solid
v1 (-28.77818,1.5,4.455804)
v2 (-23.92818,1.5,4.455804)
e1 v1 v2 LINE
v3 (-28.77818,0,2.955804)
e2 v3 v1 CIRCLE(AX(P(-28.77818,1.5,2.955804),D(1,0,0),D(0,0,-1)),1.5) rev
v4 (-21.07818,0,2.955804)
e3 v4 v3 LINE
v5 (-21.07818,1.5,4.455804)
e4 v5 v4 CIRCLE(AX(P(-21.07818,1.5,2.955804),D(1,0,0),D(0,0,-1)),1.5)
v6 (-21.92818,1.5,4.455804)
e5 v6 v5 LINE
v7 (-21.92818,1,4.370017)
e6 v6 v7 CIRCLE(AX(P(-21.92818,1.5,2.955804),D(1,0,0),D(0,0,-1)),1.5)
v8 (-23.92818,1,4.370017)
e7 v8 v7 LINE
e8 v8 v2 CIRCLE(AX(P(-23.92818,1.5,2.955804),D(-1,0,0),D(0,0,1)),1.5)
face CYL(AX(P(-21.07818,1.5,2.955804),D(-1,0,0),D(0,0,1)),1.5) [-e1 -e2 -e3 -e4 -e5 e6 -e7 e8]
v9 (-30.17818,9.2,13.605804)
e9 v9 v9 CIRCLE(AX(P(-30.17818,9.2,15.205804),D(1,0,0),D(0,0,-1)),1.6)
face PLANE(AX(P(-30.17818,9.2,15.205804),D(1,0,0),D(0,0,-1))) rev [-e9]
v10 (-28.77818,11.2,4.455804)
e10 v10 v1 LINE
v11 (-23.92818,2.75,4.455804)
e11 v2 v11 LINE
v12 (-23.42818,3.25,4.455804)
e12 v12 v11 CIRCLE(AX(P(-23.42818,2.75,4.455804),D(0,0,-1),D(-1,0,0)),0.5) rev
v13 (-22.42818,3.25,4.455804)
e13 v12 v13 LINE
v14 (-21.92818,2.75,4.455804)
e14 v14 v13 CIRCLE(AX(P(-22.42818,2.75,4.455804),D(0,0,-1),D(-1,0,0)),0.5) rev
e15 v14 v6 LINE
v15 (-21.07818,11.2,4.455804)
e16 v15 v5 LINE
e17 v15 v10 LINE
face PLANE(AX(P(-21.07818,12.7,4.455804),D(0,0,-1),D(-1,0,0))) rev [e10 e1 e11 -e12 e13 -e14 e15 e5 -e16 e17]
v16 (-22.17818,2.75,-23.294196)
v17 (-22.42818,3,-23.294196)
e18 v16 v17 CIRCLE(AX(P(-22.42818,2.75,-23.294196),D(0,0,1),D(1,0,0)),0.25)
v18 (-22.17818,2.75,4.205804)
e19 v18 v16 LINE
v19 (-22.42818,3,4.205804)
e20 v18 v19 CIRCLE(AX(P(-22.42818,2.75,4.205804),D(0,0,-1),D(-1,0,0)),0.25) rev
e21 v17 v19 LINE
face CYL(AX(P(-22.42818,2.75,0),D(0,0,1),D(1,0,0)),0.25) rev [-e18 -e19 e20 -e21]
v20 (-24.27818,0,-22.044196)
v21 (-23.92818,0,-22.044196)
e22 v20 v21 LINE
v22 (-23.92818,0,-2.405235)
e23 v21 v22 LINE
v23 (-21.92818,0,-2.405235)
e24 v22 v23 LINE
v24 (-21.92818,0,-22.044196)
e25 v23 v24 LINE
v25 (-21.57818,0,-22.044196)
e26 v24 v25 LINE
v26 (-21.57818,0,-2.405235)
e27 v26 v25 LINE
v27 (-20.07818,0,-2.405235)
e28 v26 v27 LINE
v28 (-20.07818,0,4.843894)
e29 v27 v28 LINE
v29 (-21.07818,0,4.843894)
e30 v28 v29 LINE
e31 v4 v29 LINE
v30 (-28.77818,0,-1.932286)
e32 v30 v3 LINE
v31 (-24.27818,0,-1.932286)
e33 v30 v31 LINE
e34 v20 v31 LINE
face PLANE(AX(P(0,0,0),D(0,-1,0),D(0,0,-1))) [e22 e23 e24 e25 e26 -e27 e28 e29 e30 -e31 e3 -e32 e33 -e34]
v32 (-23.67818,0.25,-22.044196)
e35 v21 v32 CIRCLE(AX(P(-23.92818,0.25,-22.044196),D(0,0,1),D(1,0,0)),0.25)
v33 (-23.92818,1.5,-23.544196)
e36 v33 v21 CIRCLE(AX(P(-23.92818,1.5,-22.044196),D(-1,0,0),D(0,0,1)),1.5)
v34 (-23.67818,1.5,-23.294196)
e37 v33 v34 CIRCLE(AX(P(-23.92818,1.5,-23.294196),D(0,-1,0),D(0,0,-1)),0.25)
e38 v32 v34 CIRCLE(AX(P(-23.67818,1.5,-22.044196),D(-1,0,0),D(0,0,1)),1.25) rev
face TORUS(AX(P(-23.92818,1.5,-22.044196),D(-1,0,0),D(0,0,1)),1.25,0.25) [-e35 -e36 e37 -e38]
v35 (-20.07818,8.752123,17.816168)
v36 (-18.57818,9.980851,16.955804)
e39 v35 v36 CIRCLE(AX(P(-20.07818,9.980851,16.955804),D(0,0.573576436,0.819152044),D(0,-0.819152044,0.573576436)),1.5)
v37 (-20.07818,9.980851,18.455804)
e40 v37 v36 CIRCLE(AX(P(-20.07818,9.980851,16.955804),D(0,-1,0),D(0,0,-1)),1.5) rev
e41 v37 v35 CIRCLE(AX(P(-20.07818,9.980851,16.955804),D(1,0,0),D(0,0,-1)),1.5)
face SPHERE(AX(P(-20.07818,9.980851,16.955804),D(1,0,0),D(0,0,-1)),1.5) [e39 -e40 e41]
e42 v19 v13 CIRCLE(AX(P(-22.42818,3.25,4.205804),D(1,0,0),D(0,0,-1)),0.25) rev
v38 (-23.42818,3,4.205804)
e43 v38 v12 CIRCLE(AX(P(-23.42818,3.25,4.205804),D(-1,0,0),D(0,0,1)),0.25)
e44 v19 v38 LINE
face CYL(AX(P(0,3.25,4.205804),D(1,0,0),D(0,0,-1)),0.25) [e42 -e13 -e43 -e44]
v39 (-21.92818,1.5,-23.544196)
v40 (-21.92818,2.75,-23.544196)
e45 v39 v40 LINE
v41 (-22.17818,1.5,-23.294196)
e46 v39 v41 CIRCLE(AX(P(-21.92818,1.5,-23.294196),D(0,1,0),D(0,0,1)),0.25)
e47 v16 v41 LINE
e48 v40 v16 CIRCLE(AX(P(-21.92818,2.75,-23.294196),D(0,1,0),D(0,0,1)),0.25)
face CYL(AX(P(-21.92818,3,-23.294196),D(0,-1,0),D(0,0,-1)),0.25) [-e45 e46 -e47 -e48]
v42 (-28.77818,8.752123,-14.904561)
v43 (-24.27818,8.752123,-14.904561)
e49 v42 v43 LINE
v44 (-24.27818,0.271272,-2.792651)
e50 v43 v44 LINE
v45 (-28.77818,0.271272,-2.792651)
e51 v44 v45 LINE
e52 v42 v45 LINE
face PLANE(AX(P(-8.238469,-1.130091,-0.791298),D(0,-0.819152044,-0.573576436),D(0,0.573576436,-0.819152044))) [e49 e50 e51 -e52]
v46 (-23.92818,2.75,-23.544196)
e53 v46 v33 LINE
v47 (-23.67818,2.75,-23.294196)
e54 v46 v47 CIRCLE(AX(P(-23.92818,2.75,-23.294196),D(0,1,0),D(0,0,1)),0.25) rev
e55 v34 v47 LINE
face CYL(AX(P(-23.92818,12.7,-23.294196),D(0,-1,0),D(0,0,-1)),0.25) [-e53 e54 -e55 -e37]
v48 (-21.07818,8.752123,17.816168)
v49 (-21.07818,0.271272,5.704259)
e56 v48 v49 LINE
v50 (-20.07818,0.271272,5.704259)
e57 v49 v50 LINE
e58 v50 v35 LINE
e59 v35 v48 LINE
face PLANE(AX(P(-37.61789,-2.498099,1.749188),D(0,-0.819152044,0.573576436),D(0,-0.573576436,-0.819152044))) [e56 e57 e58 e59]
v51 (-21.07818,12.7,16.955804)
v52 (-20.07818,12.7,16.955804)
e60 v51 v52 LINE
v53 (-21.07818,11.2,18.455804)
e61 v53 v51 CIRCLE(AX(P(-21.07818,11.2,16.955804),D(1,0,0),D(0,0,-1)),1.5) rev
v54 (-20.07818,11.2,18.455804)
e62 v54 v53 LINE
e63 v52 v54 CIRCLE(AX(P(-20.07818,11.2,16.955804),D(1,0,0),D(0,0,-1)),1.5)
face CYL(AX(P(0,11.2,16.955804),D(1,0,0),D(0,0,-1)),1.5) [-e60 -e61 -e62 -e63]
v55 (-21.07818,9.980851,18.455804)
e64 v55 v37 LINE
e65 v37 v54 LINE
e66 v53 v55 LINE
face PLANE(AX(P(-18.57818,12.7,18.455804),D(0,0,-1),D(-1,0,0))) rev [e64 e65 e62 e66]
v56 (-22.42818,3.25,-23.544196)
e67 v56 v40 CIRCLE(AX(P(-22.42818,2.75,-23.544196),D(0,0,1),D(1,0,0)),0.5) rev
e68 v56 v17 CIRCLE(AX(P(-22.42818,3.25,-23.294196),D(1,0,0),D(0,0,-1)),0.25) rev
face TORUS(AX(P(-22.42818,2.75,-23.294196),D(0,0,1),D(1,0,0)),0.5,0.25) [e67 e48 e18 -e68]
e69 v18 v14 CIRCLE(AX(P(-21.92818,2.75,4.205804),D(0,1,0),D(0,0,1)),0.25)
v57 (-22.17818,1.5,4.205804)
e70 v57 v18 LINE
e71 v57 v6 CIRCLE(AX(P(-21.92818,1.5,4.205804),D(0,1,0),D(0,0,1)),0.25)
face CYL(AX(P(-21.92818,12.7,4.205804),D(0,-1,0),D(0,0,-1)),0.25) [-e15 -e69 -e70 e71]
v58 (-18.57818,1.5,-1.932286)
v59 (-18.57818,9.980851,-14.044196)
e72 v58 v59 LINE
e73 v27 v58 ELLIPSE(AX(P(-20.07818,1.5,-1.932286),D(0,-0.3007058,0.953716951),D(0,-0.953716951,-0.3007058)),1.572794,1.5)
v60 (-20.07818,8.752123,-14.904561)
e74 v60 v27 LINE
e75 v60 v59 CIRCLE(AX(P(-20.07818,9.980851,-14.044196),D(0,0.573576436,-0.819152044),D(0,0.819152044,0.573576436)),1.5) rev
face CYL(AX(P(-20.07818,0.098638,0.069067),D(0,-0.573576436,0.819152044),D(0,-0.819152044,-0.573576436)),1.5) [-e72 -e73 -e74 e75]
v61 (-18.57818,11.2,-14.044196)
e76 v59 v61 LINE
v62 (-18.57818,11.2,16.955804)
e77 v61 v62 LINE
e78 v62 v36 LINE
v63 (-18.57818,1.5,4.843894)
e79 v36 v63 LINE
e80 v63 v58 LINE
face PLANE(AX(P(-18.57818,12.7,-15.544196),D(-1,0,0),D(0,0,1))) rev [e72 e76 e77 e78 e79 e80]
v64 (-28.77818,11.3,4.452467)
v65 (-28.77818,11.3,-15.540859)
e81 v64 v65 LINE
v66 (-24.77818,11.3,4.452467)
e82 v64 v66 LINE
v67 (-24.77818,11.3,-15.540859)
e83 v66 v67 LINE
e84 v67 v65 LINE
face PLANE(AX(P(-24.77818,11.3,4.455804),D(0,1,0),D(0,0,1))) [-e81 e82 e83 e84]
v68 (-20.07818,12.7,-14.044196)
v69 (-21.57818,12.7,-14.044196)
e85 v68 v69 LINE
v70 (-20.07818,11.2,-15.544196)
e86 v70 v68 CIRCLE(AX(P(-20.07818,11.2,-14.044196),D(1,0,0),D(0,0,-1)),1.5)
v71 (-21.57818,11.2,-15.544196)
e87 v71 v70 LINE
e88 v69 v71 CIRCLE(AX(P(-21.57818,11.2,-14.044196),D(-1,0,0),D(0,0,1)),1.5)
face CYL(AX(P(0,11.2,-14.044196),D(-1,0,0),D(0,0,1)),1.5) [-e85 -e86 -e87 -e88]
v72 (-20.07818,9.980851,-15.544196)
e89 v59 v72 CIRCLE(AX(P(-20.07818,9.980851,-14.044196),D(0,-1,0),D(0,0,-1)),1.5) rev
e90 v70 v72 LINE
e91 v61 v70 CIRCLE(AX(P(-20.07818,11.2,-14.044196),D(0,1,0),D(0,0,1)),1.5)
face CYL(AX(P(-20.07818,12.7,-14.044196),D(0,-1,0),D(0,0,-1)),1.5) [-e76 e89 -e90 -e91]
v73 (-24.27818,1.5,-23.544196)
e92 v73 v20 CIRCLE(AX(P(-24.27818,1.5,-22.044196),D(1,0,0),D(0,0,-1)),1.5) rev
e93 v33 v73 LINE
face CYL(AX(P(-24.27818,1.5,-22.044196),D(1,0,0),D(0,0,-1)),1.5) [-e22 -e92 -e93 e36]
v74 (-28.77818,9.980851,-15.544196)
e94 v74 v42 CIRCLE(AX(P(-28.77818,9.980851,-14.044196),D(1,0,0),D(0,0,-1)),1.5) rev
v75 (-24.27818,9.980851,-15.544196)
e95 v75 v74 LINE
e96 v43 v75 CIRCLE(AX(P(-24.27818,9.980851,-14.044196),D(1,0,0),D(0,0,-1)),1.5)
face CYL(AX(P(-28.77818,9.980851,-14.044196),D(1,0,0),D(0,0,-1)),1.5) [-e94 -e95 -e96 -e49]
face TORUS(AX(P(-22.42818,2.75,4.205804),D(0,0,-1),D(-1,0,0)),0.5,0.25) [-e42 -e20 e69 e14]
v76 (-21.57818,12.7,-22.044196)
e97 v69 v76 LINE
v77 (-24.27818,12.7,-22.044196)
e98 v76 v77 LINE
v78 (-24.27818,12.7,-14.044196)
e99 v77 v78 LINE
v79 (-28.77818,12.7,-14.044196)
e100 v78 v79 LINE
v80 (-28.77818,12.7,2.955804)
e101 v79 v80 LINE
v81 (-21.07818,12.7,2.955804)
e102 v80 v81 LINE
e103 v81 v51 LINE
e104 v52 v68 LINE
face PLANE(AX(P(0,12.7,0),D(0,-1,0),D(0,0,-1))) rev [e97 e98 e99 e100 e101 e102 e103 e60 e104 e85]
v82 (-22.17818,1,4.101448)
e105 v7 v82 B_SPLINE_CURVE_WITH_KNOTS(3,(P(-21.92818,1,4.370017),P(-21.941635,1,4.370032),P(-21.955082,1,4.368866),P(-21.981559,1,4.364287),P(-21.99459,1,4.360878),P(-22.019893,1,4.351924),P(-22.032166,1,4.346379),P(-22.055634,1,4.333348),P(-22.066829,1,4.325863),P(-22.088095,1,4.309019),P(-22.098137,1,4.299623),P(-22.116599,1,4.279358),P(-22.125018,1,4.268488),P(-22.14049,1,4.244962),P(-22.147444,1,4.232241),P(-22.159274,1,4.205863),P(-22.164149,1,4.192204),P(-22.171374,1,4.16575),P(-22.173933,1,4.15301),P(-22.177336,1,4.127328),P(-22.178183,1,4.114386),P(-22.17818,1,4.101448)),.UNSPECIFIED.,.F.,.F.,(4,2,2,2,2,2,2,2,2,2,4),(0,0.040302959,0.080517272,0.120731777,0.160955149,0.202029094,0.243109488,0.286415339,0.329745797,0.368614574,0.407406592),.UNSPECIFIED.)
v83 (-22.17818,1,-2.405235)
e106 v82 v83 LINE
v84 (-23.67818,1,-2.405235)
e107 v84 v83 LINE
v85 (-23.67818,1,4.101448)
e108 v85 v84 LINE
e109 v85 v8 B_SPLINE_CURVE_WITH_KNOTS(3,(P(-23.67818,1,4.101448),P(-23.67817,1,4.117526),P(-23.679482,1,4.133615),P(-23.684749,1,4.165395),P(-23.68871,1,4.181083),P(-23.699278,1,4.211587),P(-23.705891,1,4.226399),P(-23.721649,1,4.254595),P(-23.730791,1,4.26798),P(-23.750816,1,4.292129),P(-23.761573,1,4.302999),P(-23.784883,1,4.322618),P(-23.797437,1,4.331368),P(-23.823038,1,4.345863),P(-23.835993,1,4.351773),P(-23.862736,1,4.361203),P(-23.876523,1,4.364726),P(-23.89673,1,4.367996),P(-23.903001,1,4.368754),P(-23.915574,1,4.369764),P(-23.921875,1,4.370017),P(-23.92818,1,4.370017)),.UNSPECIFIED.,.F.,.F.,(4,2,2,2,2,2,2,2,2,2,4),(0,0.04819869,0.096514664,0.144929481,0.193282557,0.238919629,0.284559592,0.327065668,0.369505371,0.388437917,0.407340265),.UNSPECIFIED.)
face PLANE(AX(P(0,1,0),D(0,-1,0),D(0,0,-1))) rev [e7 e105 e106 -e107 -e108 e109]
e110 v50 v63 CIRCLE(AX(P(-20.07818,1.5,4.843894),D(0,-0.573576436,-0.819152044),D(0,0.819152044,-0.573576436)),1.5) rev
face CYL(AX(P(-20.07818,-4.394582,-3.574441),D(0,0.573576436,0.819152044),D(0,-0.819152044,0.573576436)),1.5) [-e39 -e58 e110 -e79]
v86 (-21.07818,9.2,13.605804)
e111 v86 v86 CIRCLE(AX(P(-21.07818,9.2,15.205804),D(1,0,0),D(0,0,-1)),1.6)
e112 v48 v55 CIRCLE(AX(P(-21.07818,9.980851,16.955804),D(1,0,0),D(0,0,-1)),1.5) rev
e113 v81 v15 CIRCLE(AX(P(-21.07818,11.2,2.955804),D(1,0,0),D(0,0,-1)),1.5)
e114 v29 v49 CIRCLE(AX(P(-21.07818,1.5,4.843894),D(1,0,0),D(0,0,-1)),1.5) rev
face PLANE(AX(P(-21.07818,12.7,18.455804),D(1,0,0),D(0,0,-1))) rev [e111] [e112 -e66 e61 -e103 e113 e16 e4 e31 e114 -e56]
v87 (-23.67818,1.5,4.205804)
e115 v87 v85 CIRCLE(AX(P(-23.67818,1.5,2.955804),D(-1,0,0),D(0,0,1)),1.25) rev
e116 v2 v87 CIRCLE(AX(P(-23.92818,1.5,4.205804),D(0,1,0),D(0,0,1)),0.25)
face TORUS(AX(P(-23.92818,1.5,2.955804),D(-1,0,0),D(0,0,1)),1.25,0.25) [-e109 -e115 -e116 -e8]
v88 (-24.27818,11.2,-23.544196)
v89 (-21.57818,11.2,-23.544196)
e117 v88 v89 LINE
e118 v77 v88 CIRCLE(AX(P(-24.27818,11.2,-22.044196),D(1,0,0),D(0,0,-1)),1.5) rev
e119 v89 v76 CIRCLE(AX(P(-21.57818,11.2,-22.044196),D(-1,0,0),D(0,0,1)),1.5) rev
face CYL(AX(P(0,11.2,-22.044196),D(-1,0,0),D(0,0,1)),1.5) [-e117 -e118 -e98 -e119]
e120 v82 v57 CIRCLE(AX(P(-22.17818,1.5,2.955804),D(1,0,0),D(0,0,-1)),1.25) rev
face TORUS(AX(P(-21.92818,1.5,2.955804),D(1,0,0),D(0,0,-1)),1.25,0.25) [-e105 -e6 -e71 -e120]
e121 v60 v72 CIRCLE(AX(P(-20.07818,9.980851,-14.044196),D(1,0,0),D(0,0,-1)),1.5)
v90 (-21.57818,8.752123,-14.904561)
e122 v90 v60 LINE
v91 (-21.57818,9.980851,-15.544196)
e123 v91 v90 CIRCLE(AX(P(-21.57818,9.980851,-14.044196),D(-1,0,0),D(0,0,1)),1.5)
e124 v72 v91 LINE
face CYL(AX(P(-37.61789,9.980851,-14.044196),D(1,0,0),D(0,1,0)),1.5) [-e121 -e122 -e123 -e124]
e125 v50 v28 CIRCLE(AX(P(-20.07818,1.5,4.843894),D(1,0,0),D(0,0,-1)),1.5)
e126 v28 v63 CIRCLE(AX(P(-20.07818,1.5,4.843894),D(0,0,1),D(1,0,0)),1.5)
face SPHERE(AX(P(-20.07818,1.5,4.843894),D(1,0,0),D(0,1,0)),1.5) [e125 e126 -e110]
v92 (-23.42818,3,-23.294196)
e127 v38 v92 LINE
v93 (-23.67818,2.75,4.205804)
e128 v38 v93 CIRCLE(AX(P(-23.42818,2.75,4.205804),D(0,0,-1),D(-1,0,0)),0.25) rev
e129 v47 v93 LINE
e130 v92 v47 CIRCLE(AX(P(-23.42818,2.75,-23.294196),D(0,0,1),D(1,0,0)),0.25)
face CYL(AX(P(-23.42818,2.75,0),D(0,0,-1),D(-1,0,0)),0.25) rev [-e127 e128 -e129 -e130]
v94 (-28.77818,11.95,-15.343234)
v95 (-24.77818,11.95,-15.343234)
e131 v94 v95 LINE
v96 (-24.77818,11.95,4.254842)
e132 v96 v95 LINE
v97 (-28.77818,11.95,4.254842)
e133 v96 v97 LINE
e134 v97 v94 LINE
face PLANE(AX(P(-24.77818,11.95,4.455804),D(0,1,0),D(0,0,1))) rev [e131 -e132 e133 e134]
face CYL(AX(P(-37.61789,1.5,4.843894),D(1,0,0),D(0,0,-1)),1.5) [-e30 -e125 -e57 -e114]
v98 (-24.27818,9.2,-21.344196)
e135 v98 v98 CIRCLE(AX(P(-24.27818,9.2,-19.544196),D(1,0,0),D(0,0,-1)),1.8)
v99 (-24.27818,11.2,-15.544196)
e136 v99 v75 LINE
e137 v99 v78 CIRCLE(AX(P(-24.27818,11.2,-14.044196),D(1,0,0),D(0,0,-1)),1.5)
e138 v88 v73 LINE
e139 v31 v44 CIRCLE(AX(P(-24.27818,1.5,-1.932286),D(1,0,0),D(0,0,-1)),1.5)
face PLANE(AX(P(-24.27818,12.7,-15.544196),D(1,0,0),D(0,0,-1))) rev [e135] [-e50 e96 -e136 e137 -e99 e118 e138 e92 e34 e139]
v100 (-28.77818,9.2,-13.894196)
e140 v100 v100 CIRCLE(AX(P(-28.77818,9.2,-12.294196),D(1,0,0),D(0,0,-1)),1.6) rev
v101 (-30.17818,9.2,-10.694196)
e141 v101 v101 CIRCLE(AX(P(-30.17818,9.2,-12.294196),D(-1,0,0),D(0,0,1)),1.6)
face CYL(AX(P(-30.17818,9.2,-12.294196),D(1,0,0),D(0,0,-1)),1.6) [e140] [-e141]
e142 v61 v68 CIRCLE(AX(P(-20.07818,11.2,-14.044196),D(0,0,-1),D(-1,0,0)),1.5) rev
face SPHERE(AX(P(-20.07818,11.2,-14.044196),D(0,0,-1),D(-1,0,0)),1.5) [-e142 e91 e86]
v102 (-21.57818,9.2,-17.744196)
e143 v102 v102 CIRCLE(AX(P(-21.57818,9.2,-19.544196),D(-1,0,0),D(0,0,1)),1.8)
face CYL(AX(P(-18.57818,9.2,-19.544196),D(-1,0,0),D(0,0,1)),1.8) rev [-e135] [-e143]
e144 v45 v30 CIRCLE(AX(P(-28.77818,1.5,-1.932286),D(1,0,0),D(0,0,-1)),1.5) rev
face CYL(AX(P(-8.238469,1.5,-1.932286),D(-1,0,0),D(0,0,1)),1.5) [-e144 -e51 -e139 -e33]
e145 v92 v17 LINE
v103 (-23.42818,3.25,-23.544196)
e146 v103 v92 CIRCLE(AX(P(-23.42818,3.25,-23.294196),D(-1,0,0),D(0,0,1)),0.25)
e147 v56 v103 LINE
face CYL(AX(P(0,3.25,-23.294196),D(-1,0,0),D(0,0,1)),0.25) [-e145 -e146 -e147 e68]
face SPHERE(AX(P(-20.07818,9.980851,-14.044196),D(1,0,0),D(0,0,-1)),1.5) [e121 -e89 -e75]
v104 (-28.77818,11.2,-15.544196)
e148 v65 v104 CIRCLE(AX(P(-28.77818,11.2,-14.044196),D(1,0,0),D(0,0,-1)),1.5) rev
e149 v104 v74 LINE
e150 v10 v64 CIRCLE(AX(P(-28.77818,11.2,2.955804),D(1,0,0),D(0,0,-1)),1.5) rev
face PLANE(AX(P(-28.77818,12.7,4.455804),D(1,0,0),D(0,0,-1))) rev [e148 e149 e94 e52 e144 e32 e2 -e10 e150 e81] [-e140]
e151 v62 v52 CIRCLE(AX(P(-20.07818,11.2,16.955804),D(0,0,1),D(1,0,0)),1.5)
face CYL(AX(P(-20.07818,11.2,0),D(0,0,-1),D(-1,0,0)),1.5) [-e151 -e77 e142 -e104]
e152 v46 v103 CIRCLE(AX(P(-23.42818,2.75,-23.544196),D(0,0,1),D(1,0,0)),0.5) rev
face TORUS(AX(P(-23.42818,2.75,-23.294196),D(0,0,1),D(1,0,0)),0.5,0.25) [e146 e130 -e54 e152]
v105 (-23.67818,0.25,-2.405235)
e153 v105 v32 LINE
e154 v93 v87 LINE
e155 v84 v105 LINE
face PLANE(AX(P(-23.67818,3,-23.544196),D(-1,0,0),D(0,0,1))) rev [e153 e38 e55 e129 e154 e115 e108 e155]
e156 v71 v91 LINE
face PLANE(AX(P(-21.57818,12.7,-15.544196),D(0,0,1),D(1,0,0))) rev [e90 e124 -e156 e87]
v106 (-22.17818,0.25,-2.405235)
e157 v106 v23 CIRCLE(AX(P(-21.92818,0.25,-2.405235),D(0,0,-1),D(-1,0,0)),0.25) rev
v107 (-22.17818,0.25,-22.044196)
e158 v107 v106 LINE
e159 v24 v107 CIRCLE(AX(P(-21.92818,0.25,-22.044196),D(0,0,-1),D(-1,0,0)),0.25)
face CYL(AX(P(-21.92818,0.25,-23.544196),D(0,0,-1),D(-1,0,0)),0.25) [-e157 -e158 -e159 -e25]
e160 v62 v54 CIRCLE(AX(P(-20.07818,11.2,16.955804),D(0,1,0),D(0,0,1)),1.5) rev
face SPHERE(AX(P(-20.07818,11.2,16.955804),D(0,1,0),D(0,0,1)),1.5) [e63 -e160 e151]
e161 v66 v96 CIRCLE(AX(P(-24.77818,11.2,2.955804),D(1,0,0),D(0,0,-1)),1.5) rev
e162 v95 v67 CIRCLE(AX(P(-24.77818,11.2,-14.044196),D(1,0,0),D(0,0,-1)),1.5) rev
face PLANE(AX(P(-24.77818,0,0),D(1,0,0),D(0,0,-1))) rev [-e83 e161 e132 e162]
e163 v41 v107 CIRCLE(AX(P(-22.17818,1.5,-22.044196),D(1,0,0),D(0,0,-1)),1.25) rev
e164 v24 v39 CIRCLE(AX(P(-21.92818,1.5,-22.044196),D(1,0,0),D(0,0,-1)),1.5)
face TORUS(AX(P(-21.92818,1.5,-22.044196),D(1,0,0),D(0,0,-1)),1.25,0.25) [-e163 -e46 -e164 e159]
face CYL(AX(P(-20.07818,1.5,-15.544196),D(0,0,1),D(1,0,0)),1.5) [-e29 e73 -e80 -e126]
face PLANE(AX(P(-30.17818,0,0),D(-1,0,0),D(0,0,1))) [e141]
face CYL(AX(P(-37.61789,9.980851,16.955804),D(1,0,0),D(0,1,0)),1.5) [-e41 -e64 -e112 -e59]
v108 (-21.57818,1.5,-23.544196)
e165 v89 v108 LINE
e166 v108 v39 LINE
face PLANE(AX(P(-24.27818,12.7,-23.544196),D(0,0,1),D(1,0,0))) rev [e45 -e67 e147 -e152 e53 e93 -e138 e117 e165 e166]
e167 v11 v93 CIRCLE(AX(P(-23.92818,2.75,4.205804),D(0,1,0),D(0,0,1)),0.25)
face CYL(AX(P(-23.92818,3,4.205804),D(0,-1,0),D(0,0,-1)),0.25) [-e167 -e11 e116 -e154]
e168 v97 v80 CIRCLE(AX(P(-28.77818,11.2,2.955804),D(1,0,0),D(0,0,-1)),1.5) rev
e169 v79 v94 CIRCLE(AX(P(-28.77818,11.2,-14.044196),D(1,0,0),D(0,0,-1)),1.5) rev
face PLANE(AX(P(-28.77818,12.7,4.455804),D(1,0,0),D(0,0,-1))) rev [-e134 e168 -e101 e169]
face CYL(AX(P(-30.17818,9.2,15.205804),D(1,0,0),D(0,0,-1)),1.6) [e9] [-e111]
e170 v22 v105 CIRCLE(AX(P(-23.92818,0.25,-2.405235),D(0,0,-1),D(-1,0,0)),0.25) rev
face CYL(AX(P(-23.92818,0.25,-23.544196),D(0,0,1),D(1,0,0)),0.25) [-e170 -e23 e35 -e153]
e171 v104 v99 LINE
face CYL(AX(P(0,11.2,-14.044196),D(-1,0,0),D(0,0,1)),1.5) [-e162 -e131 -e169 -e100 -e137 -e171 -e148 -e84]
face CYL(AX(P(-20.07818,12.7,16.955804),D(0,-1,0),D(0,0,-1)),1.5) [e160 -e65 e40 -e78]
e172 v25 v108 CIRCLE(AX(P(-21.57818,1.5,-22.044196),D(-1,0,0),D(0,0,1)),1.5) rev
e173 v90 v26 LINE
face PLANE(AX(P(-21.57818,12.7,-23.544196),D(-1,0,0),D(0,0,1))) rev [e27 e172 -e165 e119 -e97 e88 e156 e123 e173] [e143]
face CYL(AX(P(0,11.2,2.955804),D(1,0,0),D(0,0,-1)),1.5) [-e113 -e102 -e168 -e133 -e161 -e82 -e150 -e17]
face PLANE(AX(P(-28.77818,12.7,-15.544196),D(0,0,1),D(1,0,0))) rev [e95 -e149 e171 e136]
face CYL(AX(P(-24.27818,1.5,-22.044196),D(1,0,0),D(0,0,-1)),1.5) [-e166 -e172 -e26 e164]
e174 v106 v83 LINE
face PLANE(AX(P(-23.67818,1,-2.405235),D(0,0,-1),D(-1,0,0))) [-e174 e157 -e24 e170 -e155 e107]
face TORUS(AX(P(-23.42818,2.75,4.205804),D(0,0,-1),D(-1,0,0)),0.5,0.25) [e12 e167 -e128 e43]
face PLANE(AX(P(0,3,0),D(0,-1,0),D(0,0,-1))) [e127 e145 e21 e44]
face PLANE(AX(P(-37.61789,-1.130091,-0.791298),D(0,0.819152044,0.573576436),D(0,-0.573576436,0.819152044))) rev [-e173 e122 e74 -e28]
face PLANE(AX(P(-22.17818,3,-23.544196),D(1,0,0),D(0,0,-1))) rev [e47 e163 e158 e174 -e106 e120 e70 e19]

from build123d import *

# Parameters (mm, degrees)
BOSS_EXTRUDE1_DEPTH = 12.7
CUT_EXTRUDE2_DEPTH  = 4.5
CUT_EXTRUDE3_DEPTH  = 29.629690424
BOSS_EXTRUDE2_START = -7.7
SKETCH2_5_R         = 1.6
BOSS_EXTRUDE2_DEPTH = 9.1
SKETCH2_6_R         = 1.8
CUT_EXTRUDE4_DEPTH  = 29.629690424
SKETCH2_7_R         = 1.6
BOSS_EXTRUDE3_DEPTH = 1.4
SKETCH2_8_W         = 42
SKETCH2_8_H         = 0.65
CUT_EXTRUDE5_DEPTH  = 4
CUT_EXTRUDE6_REACH  = 31.158
SKETCH4_W           = 1.5
SKETCH4_H           = 28
CUT_EXTRUDE7_DEPTH  = 3
SKETCH6_W           = 2.1
SKETCH6_H           = 6.861038338
BOSS_EXTRUDE4_DEPTH = 1
CUT_EXTRUDE8_DEPTH  = 4.5
FILLET1_R           = 1.5
FILLET2_R           = 0.25


with BuildPart() as part:
    # Sketch1 → Boss-Extrude1 (new body)
    with BuildSketch(Plane(origin=(0, 0, 0), x_dir=(1, 0, 0), z_dir=(0, 1, 0))):
        Polygon((-28.77817965, 15.54419618), (-24.27817965, 15.54419618), (-24.27817965, 23.54419618), (-21.57817965, 23.54419618), (-21.57817965, 15.54419618), (-18.57817965, 15.54419618), (-18.57817965, -18.45580382), (-21.07817965, -18.45580382), (-21.07817965, -4.45580382), (-28.77817965, -4.45580382), align=None)
    extrude(amount=BOSS_EXTRUDE1_DEPTH)

    # Sketch2 → Cut-Extrude2 (cut)
    with BuildSketch(Plane.ZY.offset(28.77817965)):
        Polygon((-15.54419618, 5.764870839), (-15.54419618, 0), (-7.040359819, 0), align=None)
    extrude(amount=-CUT_EXTRUDE2_DEPTH, mode=Mode.SUBTRACT)

    # Sketch2<4> → Cut-Extrude3 (cut, through all)
    with BuildSketch(Plane.ZY.offset(28.77817965)):
        Polygon((12.124702683, 0), (18.45580382, 0), (18.45580382, 9.2), align=None)
    extrude(amount=-CUT_EXTRUDE3_DEPTH, mode=Mode.SUBTRACT)

    # Sketch2<5> → Boss-Extrude2 (add)
    with BuildSketch(Plane.ZY.offset(28.77817965).offset(BOSS_EXTRUDE2_START)):
        with Locations(Location((15.20580382, 9.2, 0), (0, 0, 180))):
            Circle(SKETCH2_5_R)
    extrude(amount=BOSS_EXTRUDE2_DEPTH)

    # Sketch2<6> → Cut-Extrude4 (cut, through all)
    with BuildSketch(Plane.ZY.offset(28.77817965)):
        with Locations((-19.54419618, 9.2)):
            Circle(SKETCH2_6_R)
    extrude(amount=-CUT_EXTRUDE4_DEPTH, mode=Mode.SUBTRACT)

    # Sketch2<7> → Boss-Extrude3 (add)
    with BuildSketch(Plane.ZY.offset(28.77817965)):
        with Locations(Location((-12.29419618, 9.2, 0), (0, 0, 180))):
            Circle(SKETCH2_7_R)
    extrude(amount=BOSS_EXTRUDE3_DEPTH)

    # Sketch2<8> → Cut-Extrude5 (cut)
    with BuildSketch(Plane.ZY.offset(28.77817965)):
        with Locations((-2.54419618, 11.625)):
            Rectangle(SKETCH2_8_W, SKETCH2_8_H)
    extrude(amount=-CUT_EXTRUDE5_DEPTH, mode=Mode.SUBTRACT)

    # Cut-Extrude6: up to this face of the body (flat: up to its plane)
    cut_extrude6_end = Plane(part.part.faces().sort_by_distance((-21.57817965, 6.032683514, -19.54419618))[0])
    # Sketch3 → Cut-Extrude6 (cut, up to the picked face)
    with BuildSketch(Plane(origin=(-18.57817965, 0, 0), x_dir=(0, 0, -1), z_dir=(1, 0, 0)), mode=Mode.PRIVATE) as cut_extrude6_sk1:
        Polygon((15.54419618, 0), (15.54419618, 9.2), (2.405234518, 0), align=None)
    cut_extrude6_tool1 = split(extrude(cut_extrude6_sk1.sketch, amount=-CUT_EXTRUDE6_REACH, mode=Mode.PRIVATE), bisect_by=cut_extrude6_end, keep=Keep.BOTH, mode=Mode.PRIVATE)
    # Sketch3 → Cut-Extrude6 (cut, up to the picked face)
    with BuildSketch(Plane(origin=(-18.57817965, 0, 0), x_dir=(0, 0, -1), z_dir=(1, 0, 0)), mode=Mode.PRIVATE) as cut_extrude6_sk2:
        Polygon((-12.124702683, 0), (-18.45580382, 9.2), (-18.45580382, 0), align=None)
    cut_extrude6_tool2 = split(extrude(cut_extrude6_sk2.sketch, amount=-CUT_EXTRUDE6_REACH, mode=Mode.PRIVATE), bisect_by=cut_extrude6_end, keep=Keep.BOTH, mode=Mode.PRIVATE)
    # Sketch3 → Cut-Extrude6 (cut, up to the picked face)
    with BuildSketch(Plane(origin=(-18.57817965, 0, 0), x_dir=(0, 0, -1), z_dir=(1, 0, 0)), mode=Mode.PRIVATE) as cut_extrude6_sk3:
        Polygon((-5.316842158, 0), (-18.45580382, 9.2), (-12.124702683, 0), align=None)
    cut_extrude6_tool3 = split(extrude(cut_extrude6_sk3.sketch, amount=-CUT_EXTRUDE6_REACH, mode=Mode.PRIVATE), bisect_by=cut_extrude6_end, keep=Keep.BOTH, mode=Mode.PRIVATE)
    add(cut_extrude6_tool1.solids().sort_by(Axis((-18.57818, 3.066667, -11.164542), (-1, 0, 0)))[0], mode=Mode.SUBTRACT)
    add(cut_extrude6_tool2.solids().sort_by(Axis((-18.57818, 3.066667, 16.345437), (-1, 0, 0)))[0], mode=Mode.SUBTRACT)
    add(cut_extrude6_tool3.solids().sort_by(Axis((-18.57818, 3.066667, 11.965783), (-1, 0, 0)))[0], mode=Mode.SUBTRACT)

    # Sketch4 → Cut-Extrude7 (cut)
    with BuildSketch(Plane.XZ):
        with Locations((-22.92817965, -9.54419618)):
            Rectangle(SKETCH4_W, SKETCH4_H)
    extrude(amount=-CUT_EXTRUDE7_DEPTH, mode=Mode.SUBTRACT)

    # Sketch6 → Boss-Extrude4 (add)
    with BuildSketch(Plane(origin=(0, 0, 0), x_dir=(-1, 0, 0), z_dir=(0, -1, 0))):
        with Locations((22.62817965, -1.025284651)):
            Rectangle(SKETCH6_W, SKETCH6_H)
    extrude(amount=-BOSS_EXTRUDE4_DEPTH)

    # Sketch8 → Cut-Extrude8 (cut)
    with BuildSketch(Plane.ZY.offset(28.77817965)):
        Polygon((-15.54419618, 0), (-7.040359819, 0), (-15.54419618, 5.764870839), align=None)
        Polygon((-7.040359819, 0), (-2.405234518, 0), (-15.54419618, 9.2), (-15.54419618, 5.764870839), align=None)
    extrude(amount=-CUT_EXTRUDE8_DEPTH, mode=Mode.SUBTRACT)

    # Fillet1
    # the kernel refuses this fillet: 1.5 mm, written as the material it takes off along each edge
    with BuildSketch(Plane(origin=(-20.07817965, 9.980850576, 16.95580382), x_dir=(0, 0, 1), z_dir=(1, 0, 0))) as fillet1_piece_1_section:
        Polygon((0, 0), (FILLET1_R, 0), (FILLET1_R, FILLET1_R * 0.520567050552), (FILLET1_R * 0.573576436351, FILLET1_R * 0.819152044289), align=None)
    fillet1_piece_1 = extrude(amount=FILLET1_R, mode=Mode.PRIVATE)
    fillet1_piece_1 = fillet1_piece_1 - Plane(origin=(-20.07817965, 9.980850576, 16.95580382), x_dir=(0, 0.46174861323503175, -0.8870108331782229), z_dir=(1, 0, 0)) * Sphere(FILLET1_R, mode=Mode.PRIVATE)
    add(fillet1_piece_1, mode=Mode.SUBTRACT)
    with BuildSketch(Plane(origin=(-20.07817965, 11.2, 16.95580382), x_dir=(1, 0, 0), z_dir=(0, 1, 0))) as fillet1_piece_2_section:
        Polygon((0, 0), (FILLET1_R, 0), (FILLET1_R, -FILLET1_R), (0, -FILLET1_R), align=None)
    fillet1_piece_2 = extrude(amount=FILLET1_R, mode=Mode.PRIVATE)
    fillet1_piece_2 = fillet1_piece_2 - Plane(origin=(-20.07817965, 11.2, 16.95580382), x_dir=(-0.7071067811865476, 0, -0.7071067811865474), z_dir=(0, 1, 0)) * Sphere(FILLET1_R, mode=Mode.PRIVATE)
    add(fillet1_piece_2, mode=Mode.SUBTRACT)
    with BuildSketch(Plane(origin=(-20.07817965, 1.5, 4.843893974), x_dir=(0, -0.8191520442889889, 0.5735764363510503), z_dir=(1, 0, 0))) as fillet1_piece_3_section:
        Polygon((0, 0), (FILLET1_R, 0), (FILLET1_R, FILLET1_R * 0.315298788879), (FILLET1_R * 0.819152044289, FILLET1_R * 0.573576436351), align=None)
    fillet1_piece_3 = extrude(amount=FILLET1_R, mode=Mode.PRIVATE)
    fillet1_piece_3 = fillet1_piece_3 - Plane(origin=(-20.07817965, 1.5, 4.843893974), x_dir=(0, 0.9537169507482263, -0.30070579950427556), z_dir=(1, 0, 0)) * Sphere(FILLET1_R, mode=Mode.PRIVATE)
    add(fillet1_piece_3, mode=Mode.SUBTRACT)
    with BuildSketch(Plane(origin=(-20.07817965, 9.980850576, -14.04419618), x_dir=(0, 0, -1), z_dir=(1, 0, 0))) as fillet1_piece_4_section:
        Polygon((0, 0), (FILLET1_R, 0), (FILLET1_R, -FILLET1_R * 0.520567050552), (FILLET1_R * 0.573576436351, -FILLET1_R * 0.819152044289), align=None)
    fillet1_piece_4 = extrude(amount=FILLET1_R, mode=Mode.PRIVATE)
    fillet1_piece_4 = fillet1_piece_4 - Plane(origin=(-20.07817965, 9.980850576, -14.04419618), x_dir=(0, 0.4617486132350316, 0.8870108331782229), z_dir=(1, 0, 0)) * Sphere(FILLET1_R, mode=Mode.PRIVATE)
    add(fillet1_piece_4, mode=Mode.SUBTRACT)
    with BuildSketch(Plane(origin=(-20.07817965, 11.2, -14.04419618), x_dir=(1, 0, 0), z_dir=(0, 1, 0))) as fillet1_piece_5_section:
        Polygon((0, 0), (FILLET1_R, 0), (FILLET1_R, FILLET1_R), (0, FILLET1_R), align=None)
    fillet1_piece_5 = extrude(amount=FILLET1_R, mode=Mode.PRIVATE)
    fillet1_piece_5 = fillet1_piece_5 - Plane(origin=(-20.07817965, 11.2, -14.04419618), x_dir=(-0.7071067811865475, 0, 0.7071067811865477), z_dir=(0, 1, 0)) * Sphere(FILLET1_R, mode=Mode.PRIVATE)
    add(fillet1_piece_5, mode=Mode.SUBTRACT)
    with BuildSketch(Plane(origin=(-21.07817965, 0, 4.45580382), x_dir=(0, 1, 0), z_dir=(-1, 0, 0))) as fillet1_piece_6:
        with BuildLine():
            CenterArc((FILLET1_R, FILLET1_R), FILLET1_R, 180, 90)
            Line((0, FILLET1_R), (0, 0))
            Line((0, 0), (FILLET1_R, 0))
        make_face()
    extrude(amount=11.45, mode=Mode.SUBTRACT)
    with BuildSketch(Plane(origin=(-21.07817965, 12.7, 4.45580382), x_dir=(0, -1, 0), z_dir=(-1, 0, 0))) as fillet1_piece_7:
        with BuildLine():
            CenterArc((FILLET1_R, -FILLET1_R), FILLET1_R, 90, 90)
            Line((0, -FILLET1_R), (0, 0))
            Line((0, 0), (FILLET1_R, 0))
        make_face()
    extrude(amount=11.45, mode=Mode.SUBTRACT)
    with BuildSketch(Plane(origin=(-25.92817965, 0, -23.54419618), x_dir=(0, 1, 0), z_dir=(1, 0, 0)), Plane(origin=(-28.02817965, 0, -23.54419618), x_dir=(0, 1, 0), z_dir=(1, 0, 0))) as fillet1_piece_8:
        with BuildLine():
            CenterArc((FILLET1_R, FILLET1_R), FILLET1_R, 180, 90)
            Line((0, FILLET1_R), (0, 0))
            Line((0, 0), (FILLET1_R, 0))
        make_face()
    extrude(amount=8.1, mode=Mode.SUBTRACT)
    with BuildSketch(Plane(origin=(-28.02817965, 12.7, -23.54419618), x_dir=(0, -1, 0), z_dir=(1, 0, 0))) as fillet1_piece_9:
        with BuildLine():
            CenterArc((FILLET1_R, -FILLET1_R), FILLET1_R, 90, 90)
            Line((0, -FILLET1_R), (0, 0))
            Line((0, 0), (FILLET1_R, 0))
        make_face()
    extrude(amount=10.2, mode=Mode.SUBTRACT)
    with BuildSketch(Plane(origin=(-18.57817965, 9.980850576, 18.45580382), x_dir=(0, 0, -1), z_dir=(0, 1, 0))) as fillet1_piece_10:
        with BuildLine():
            CenterArc((FILLET1_R, FILLET1_R), FILLET1_R, 180, 90)
            Line((0, FILLET1_R), (0, 0))
            Line((0, 0), (FILLET1_R, 0))
        make_face()
    extrude(amount=1.219149424, mode=Mode.SUBTRACT)
    with BuildSketch(Plane(origin=(-23.03030609, 9.2, 18.45580382), x_dir=(0, 1, 0), z_dir=(1, 0, 0))) as fillet1_piece_11:
        with BuildLine():
            CenterArc((FILLET1_R * 0.520567050552, -FILLET1_R), FILLET1_R, 90, 55)
            Line((-FILLET1_R * 0.298584993737, -FILLET1_R * 0.426423563649), (0, 0))
            Line((0, 0), (FILLET1_R * 0.520567050552, 0))
        make_face()
    extrude(amount=2.95212644, mode=Mode.SUBTRACT)
    with BuildSketch(Plane(origin=(-20.07817965, 12.7, 18.45580382), x_dir=(0, -1, 0), z_dir=(-1, 0, 0))) as fillet1_piece_12:
        with BuildLine():
            CenterArc((FILLET1_R, -FILLET1_R), FILLET1_R, 90, 90)
            Line((0, -FILLET1_R), (0, 0))
            Line((0, 0), (FILLET1_R, 0))
        make_face()
    extrude(amount=4.75, mode=Mode.SUBTRACT)
    with BuildSketch(Plane(origin=(-20.07817965, 0, 5.316842158), x_dir=(0, 0.573576436351042, 0.8191520442889947), z_dir=(-1, 0, 0))) as fillet1_piece_13:
        with BuildLine():
            CenterArc((FILLET1_R * 0.315298788879, FILLET1_R), FILLET1_R, 235, 35)
            Line((-FILLET1_R * 0.258277647472, FILLET1_R * 0.180847955711), (0, 0))
            Line((0, 0), (FILLET1_R * 0.315298788879, 0))
        make_face()
    extrude(amount=2.182370458, mode=Mode.SUBTRACT)
    with BuildSketch(Plane(origin=(-18.57817965, 0.271271934, 5.704258629), x_dir=(2.3684757858670013e-15, 0.8191520442889889, -0.5735764363510503), z_dir=(0, 0.5735764363510503, 0.8191520442889889))) as fillet1_piece_14:
        with BuildLine():
            CenterArc((FILLET1_R, FILLET1_R), FILLET1_R, 180, 90)
            Line((0, FILLET1_R), (0, 0))
            Line((0, 0), (FILLET1_R, 0))
        make_face()
    extrude(amount=14.785911761, mode=Mode.SUBTRACT)
    with BuildSketch(Plane(origin=(-18.57817965, 0, -6.155234518), x_dir=(0, 1, 0), z_dir=(0, 0, 1))) as fillet1_piece_15:
        with BuildLine():
            CenterArc((FILLET1_R, FILLET1_R), FILLET1_R, 180, 90)
            Line((0, FILLET1_R), (0, 0))
            Line((0, 0), (FILLET1_R, 0))
        make_face()
    extrude(amount=10.999128493, mode=Mode.SUBTRACT)
    with BuildSketch(Plane(origin=(-18.57817965, 8.752122509, -14.904560835), x_dir=(-1, 0, 0), z_dir=(0, -0.5735764363510504, 0.8191520442889888))) as fillet1_piece_16:
        with BuildLine():
            CenterArc((FILLET1_R, -FILLET1_R), FILLET1_R, 90, 90)
            Line((0, -FILLET1_R), (0, 0))
            Line((0, 0), (FILLET1_R, 0))
        make_face()
    extrude(amount=19.008859944, mode=Mode.SUBTRACT)
    with BuildSketch(Plane(origin=(-20.07817965, 9.2, -15.54419618), x_dir=(0, -0.5735764363510506, 0.8191520442889886), z_dir=(-1, 0, 0))) as fillet1_piece_17:
        with BuildLine():
            CenterArc((FILLET1_R * 0.520567050552, FILLET1_R), FILLET1_R, 215, 55)
            Line((-FILLET1_R * 0.298584993737, FILLET1_R * 0.426423563649), (0, 0))
            Line((0, 0), (FILLET1_R * 0.520567050552, 0))
        make_face()
    extrude(amount=1.5, mode=Mode.SUBTRACT)
    with BuildSketch(Plane(origin=(-18.57817965, 9.980850576, -15.54419618), x_dir=(0, 0, 1), z_dir=(0, 1, 0))) as fillet1_piece_18:
        with BuildLine():
            CenterArc((FILLET1_R, -FILLET1_R), FILLET1_R, 90, 90)
            Line((0, -FILLET1_R), (0, 0))
            Line((0, 0), (FILLET1_R, 0))
        make_face()
    extrude(amount=1.219149424, mode=Mode.SUBTRACT)
    with BuildSketch(Plane(origin=(-32.52817965, 12.7, -15.54419618), x_dir=(0, 0, 1), z_dir=(1, 0, 0))) as fillet1_piece_19:
        with BuildLine():
            CenterArc((FILLET1_R, FILLET1_R), FILLET1_R, 180, 90)
            Line((0, FILLET1_R), (0, 0))
            Line((0, 0), (FILLET1_R, 0))
        make_face()
    extrude(amount=8.25, mode=Mode.SUBTRACT)
    with BuildSketch(Plane(origin=(-32.52817965, 12.7, -15.54419618), x_dir=(0, 0, 1), z_dir=(1, 0, 0))) as fillet1_piece_20_section:
        with BuildLine():
            CenterArc((FILLET1_R, FILLET1_R), FILLET1_R, 180, 90)
            Line((0, FILLET1_R), (0, 0))
            Line((0, 0), (FILLET1_R, 0))
        make_face()
    fillet1_piece_20 = extrude(amount=12, mode=Mode.PRIVATE)
    fillet1_piece_20 = split(fillet1_piece_20, bisect_by=Plane(origin=(-21.57817965, 12.360407329, -15.204603509), z_dir=(1, 0, 0)), keep=Keep.TOP, mode=Mode.PRIVATE)
    add(fillet1_piece_20, mode=Mode.SUBTRACT)
    with BuildSketch(Plane(origin=(-25.32817965, 12.7, -15.54419618), x_dir=(0, -1, 0), z_dir=(1, 0, 0))) as fillet1_piece_21_section:
        with BuildLine():
            CenterArc((FILLET1_R, -FILLET1_R), FILLET1_R, 90, 90)
            Line((0, -FILLET1_R), (0, 0))
            Line((0, 0), (FILLET1_R, 0))
        make_face()
    fillet1_piece_21 = extrude(amount=5.25, mode=Mode.PRIVATE)
    fillet1_piece_21 = split(fillet1_piece_21, bisect_by=Plane(origin=(-24.27817965, 12.360407329, -15.204603509), z_dir=(-1, 0, 0)), keep=Keep.TOP, mode=Mode.PRIVATE)
    add(fillet1_piece_21, mode=Mode.SUBTRACT)
    with BuildSketch(Plane(origin=(-21.57817965, 12.7, -15.54419618), x_dir=(0, -1, 0), z_dir=(1, 0, 0))) as fillet1_piece_22:
        with BuildLine():
            CenterArc((FILLET1_R, -FILLET1_R), FILLET1_R, 90, 90)
            Line((0, -FILLET1_R), (0, 0))
            Line((0, 0), (FILLET1_R, 0))
        make_face()
    extrude(amount=1.5, mode=Mode.SUBTRACT)
    with BuildSketch(Plane(origin=(-18.57817965, 12.7, -14.04419618), x_dir=(0, -1, 0), z_dir=(0, 0, 1))) as fillet1_piece_23:
        with BuildLine():
            CenterArc((FILLET1_R, -FILLET1_R), FILLET1_R, 90, 90)
            Line((0, -FILLET1_R), (0, 0))
            Line((0, 0), (FILLET1_R, 0))
        make_face()
    extrude(amount=31, mode=Mode.SUBTRACT)
    with BuildSketch(Plane(origin=(-29.960550109, 0, -2.405234518), x_dir=(0, 0.5735764363510496, -0.8191520442889895), z_dir=(1, 0, 0))) as fillet1_piece_24:
        with BuildLine():
            CenterArc((FILLET1_R * 0.315298788879, FILLET1_R), FILLET1_R, 235, 35)
            Line((-FILLET1_R * 0.258277647472, FILLET1_R * 0.180847955711), (0, 0))
            Line((0, 0), (FILLET1_R * 0.315298788879, 0))
        make_face()
    extrude(amount=5.682370458, mode=Mode.SUBTRACT)
    with BuildSketch(Plane(origin=(-30.73030609, 9.2, -15.54419618), x_dir=(0, 1, 0), z_dir=(1, 0, 0))) as fillet1_piece_25:
        with BuildLine():
            CenterArc((FILLET1_R * 0.520567050552, FILLET1_R), FILLET1_R, 215, 55)
            Line((-FILLET1_R * 0.298584993737, FILLET1_R * 0.426423563649), (0, 0))
            Line((0, 0), (FILLET1_R * 0.520567050552, 0))
        make_face()
    extrude(amount=6.45212644, mode=Mode.SUBTRACT)

    # Fillet2
    fillet2_edges = [part.edges().sort_by_distance(p)[0] for p in [
        (-22.17817965, 3, -9.54419618),
        (-22.17817965, 2.25, 4.45580382),
        (-22.92817965, 3, -23.54419618),
        (-22.17817965, 2.25, -23.54419618),
        (-23.67817965, 3, -9.54419618),
        (-23.67817965, 2.25, -23.54419618),
        (-22.92817965, 3, 4.45580382),
        (-23.67817965, 2.25, 4.45580382),
        (-23.67817965, 0, -12.224715349),
        (-22.17817965, 0, -12.224715349),
        (-23.67817965, 0.439339828, -23.104856352),
        (-23.67817965, 1.246347032, 4.434201659),
        (-22.17817965, 0.439339828, -23.104856352),
        (-22.17817965, 1.246347032, 4.434201659),
    ]]
    fillet(fillet2_edges, radius=FILLET2_R)


solid = part.part
